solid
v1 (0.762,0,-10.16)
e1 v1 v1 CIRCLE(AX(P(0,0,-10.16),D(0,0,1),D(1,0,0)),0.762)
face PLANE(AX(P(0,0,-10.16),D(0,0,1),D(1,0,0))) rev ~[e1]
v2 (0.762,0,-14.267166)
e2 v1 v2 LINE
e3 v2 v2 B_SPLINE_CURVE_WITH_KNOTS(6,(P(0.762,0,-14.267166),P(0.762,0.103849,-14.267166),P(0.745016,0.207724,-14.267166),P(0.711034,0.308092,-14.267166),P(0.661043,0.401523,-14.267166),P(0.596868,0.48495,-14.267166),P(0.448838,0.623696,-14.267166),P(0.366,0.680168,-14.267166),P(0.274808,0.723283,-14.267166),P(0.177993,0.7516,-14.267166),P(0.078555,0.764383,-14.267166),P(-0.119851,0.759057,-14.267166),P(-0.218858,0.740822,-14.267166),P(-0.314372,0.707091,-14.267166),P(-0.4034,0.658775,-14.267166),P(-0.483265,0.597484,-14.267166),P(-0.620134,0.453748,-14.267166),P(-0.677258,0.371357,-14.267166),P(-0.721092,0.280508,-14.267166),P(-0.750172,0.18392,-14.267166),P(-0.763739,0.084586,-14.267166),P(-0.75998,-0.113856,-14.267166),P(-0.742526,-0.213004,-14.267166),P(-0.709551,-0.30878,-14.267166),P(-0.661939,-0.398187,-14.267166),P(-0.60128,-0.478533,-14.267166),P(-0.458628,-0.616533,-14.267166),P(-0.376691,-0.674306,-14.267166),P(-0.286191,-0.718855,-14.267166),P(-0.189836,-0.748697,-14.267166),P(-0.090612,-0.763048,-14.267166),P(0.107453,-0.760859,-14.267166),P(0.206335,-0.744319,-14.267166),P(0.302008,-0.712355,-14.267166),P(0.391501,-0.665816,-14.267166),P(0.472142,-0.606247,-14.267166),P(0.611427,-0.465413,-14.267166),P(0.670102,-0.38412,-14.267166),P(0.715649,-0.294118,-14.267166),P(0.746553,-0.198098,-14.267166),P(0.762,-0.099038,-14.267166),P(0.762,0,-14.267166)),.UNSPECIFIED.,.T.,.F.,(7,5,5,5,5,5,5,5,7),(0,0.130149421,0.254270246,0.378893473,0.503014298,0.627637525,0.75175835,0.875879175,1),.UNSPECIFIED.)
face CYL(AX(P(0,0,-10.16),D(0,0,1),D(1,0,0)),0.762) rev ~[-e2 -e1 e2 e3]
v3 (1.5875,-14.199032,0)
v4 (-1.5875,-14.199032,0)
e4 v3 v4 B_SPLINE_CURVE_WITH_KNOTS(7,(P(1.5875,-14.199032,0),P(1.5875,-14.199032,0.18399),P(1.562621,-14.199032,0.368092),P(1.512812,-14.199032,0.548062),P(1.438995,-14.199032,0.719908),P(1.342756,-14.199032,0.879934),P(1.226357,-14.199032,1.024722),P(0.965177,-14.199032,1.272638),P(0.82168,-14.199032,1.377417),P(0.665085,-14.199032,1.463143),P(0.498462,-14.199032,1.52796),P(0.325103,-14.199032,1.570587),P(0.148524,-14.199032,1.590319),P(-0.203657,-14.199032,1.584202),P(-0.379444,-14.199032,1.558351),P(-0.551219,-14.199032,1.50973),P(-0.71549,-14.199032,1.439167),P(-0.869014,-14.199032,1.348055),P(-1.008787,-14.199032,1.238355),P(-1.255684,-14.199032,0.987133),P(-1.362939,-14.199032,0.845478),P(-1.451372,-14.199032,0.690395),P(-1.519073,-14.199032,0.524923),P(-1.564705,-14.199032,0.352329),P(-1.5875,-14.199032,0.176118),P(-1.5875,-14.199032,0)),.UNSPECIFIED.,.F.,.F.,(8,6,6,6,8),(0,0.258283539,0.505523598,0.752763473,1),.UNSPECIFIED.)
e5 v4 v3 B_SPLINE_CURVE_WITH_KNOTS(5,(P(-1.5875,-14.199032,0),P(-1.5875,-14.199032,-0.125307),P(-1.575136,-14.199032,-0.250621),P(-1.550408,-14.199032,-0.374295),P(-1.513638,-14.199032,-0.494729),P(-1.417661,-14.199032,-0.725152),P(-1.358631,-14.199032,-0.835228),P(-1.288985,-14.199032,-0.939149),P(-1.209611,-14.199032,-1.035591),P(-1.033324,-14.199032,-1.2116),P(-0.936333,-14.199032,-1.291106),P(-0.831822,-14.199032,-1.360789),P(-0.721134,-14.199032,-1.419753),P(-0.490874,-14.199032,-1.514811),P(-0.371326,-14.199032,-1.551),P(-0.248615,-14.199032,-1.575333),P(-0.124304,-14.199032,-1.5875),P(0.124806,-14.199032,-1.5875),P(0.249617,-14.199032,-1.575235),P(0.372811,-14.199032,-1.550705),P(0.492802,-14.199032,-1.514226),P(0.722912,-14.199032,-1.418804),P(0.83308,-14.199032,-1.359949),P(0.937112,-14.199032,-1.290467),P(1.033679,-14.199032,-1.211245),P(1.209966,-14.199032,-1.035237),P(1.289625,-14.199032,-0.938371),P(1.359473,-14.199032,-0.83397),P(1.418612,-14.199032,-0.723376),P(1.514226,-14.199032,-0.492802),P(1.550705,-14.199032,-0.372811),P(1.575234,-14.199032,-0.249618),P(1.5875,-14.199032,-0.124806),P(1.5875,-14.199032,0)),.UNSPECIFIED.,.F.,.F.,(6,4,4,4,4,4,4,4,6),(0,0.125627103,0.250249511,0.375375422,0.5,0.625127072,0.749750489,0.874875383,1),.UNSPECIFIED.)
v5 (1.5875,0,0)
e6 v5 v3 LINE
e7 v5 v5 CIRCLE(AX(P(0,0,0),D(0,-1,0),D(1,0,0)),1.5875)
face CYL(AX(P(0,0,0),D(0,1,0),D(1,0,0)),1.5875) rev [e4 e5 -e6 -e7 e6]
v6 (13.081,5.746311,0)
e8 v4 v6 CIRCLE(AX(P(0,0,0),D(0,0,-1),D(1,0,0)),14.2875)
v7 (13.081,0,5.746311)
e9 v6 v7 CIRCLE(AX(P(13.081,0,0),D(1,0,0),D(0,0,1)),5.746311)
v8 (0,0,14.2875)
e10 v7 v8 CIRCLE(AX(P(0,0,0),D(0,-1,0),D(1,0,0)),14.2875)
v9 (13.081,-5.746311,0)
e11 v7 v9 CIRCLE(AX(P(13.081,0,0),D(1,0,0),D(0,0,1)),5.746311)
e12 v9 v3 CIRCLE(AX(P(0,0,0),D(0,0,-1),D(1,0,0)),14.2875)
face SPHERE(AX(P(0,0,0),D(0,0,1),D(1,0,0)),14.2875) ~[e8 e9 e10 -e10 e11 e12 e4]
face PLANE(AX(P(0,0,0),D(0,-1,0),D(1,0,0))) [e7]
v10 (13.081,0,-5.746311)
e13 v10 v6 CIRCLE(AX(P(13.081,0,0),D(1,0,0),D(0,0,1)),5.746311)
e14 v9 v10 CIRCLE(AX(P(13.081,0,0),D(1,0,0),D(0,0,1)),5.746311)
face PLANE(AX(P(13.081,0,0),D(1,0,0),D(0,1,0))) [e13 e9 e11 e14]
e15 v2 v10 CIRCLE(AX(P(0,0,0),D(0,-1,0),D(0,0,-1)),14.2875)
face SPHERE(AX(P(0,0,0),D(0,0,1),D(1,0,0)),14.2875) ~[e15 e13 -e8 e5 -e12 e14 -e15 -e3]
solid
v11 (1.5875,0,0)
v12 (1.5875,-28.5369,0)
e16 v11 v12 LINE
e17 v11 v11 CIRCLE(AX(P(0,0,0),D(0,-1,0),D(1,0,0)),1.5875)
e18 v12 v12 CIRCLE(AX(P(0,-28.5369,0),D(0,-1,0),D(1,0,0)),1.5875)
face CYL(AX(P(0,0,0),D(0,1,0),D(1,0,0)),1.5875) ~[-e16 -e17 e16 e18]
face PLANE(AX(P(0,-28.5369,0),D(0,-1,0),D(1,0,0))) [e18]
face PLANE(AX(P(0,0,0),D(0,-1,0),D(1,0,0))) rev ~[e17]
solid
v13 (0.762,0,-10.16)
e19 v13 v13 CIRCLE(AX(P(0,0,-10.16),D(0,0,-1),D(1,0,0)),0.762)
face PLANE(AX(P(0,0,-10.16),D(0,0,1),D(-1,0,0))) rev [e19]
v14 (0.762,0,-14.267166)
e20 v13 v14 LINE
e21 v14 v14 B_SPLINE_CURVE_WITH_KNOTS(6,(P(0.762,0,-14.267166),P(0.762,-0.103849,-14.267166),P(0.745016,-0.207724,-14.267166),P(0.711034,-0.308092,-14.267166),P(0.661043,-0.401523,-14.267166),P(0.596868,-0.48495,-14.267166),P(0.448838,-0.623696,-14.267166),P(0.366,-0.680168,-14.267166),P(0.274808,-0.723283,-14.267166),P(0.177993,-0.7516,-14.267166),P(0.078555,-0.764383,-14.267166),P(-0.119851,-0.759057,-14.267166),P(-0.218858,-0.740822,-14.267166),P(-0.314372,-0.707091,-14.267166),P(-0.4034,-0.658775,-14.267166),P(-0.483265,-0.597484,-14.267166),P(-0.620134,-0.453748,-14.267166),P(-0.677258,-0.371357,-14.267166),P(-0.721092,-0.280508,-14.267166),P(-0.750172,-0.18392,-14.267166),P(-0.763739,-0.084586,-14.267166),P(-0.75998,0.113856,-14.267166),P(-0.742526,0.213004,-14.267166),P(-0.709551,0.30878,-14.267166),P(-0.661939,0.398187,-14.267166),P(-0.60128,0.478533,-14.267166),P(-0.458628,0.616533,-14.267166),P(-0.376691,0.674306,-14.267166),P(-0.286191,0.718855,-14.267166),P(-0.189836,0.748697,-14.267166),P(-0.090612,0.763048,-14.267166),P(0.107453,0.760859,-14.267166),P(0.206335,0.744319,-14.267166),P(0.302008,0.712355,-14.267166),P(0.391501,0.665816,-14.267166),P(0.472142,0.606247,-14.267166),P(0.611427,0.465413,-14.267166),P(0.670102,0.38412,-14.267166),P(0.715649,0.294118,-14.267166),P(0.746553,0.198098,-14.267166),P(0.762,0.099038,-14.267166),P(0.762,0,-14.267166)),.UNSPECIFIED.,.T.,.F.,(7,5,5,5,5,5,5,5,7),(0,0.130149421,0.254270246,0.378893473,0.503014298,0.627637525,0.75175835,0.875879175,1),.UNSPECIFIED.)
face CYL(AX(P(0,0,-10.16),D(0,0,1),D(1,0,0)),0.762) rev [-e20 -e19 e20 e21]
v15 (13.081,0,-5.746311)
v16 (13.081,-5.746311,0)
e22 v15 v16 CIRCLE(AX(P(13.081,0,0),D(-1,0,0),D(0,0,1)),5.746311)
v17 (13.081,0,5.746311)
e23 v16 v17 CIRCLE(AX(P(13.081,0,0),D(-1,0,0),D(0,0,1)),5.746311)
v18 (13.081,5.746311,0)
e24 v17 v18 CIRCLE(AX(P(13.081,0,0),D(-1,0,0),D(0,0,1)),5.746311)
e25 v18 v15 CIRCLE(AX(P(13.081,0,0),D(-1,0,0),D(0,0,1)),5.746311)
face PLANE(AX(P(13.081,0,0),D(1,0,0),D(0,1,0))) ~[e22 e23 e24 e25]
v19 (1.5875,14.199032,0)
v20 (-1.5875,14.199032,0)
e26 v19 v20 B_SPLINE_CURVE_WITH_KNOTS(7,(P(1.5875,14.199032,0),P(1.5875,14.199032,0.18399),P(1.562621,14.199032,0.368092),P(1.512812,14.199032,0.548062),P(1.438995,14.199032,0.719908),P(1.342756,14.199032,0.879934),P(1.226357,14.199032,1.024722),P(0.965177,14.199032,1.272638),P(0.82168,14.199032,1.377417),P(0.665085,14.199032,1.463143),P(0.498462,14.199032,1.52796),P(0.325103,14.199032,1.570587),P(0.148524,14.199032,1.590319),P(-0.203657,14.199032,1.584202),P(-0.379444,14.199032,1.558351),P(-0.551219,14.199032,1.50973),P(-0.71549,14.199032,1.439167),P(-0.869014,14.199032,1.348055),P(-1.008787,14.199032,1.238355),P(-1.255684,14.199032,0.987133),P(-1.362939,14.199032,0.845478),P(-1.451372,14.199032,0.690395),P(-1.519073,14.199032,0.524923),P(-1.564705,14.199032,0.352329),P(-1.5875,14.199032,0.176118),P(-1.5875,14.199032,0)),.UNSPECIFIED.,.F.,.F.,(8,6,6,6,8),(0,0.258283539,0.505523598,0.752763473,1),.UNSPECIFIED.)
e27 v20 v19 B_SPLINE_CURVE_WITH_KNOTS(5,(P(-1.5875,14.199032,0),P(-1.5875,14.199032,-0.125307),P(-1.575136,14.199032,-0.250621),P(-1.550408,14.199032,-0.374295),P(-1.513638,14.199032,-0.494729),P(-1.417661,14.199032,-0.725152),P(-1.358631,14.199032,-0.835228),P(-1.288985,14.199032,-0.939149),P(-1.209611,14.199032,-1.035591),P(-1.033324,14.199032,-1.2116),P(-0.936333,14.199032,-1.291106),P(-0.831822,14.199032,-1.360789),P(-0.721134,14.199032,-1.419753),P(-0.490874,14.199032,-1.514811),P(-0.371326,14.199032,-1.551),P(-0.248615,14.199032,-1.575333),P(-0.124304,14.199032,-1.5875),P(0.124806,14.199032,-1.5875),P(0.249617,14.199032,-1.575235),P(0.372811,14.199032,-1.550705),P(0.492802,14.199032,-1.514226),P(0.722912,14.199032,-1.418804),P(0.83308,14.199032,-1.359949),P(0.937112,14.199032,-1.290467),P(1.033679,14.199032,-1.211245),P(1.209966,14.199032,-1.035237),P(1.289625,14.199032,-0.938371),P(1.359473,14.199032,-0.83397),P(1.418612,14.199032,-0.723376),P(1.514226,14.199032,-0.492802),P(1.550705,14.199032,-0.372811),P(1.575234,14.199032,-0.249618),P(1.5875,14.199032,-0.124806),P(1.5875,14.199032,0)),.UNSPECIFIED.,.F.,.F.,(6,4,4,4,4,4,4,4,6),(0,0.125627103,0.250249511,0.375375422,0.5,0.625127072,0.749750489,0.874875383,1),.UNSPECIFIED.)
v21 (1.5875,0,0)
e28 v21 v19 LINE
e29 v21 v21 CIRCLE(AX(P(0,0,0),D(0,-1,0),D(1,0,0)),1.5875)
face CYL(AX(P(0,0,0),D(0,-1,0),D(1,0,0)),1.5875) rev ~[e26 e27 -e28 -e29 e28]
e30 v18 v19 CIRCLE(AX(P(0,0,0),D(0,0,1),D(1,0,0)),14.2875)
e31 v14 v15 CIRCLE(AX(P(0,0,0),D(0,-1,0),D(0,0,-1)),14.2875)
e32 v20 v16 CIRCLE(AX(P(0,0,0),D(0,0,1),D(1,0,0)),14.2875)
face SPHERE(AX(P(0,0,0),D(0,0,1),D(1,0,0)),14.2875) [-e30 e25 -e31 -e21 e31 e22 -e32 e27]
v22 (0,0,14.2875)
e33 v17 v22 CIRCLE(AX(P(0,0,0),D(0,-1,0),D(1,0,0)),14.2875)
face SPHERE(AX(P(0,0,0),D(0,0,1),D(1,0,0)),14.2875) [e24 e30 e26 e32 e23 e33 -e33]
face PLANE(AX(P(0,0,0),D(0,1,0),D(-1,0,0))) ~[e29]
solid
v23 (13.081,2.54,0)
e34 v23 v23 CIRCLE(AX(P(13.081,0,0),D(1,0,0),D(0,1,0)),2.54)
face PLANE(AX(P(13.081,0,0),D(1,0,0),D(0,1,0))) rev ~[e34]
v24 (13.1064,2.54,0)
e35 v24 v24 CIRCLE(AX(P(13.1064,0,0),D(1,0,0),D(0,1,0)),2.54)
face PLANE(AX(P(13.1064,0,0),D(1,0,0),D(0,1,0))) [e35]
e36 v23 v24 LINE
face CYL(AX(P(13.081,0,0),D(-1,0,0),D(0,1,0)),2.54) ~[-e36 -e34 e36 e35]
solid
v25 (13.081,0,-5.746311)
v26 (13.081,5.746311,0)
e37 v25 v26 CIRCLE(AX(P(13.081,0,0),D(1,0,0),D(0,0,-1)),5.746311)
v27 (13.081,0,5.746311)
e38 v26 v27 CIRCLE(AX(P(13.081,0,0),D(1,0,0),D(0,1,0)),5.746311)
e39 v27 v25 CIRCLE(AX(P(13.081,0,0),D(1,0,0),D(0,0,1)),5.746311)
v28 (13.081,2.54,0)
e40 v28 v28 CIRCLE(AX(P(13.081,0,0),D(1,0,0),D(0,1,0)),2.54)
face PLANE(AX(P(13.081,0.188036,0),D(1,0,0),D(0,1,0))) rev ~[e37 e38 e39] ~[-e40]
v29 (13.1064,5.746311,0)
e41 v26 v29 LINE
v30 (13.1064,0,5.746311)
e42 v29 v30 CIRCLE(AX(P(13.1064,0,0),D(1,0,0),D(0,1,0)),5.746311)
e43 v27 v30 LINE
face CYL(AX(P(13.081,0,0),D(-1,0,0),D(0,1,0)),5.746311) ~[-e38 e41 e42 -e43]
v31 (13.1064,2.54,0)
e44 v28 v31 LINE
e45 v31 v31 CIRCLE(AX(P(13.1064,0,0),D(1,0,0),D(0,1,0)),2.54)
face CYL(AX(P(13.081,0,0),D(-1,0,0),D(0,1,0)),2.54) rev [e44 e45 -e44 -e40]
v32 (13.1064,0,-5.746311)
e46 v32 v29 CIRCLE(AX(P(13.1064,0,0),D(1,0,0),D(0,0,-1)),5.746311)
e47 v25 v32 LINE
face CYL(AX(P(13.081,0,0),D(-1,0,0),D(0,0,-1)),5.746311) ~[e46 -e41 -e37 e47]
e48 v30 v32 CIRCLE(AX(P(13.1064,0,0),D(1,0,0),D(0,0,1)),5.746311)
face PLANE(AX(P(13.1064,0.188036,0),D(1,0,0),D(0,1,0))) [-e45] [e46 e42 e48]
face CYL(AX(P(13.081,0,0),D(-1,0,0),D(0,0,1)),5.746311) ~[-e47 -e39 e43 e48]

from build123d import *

# Parameters (mm, degrees)
F3_START  = 13.081
F2_R      = 5.7833610308
F3_DEPTH  = 1.2065
F4_R      = 2.54
F5_DEPTH  = 0.0254
F6_DEPTH  = 0.0254
F8_START  = -10.16
F7_R      = 0.762
F8_DEPTH  = 35.56
F9_R      = 1.5875
F10_DEPTH = 14.2875
F11_DEPTH = 28.5369


# Not quite as in the source:
# - a feature names something its author has since deleted; it is built from what else it names


with BuildPart() as f1:
    # F0 (on Front) → F1 (revolve)
    with BuildSketch(Plane.XZ):
        with BuildLine():
            ThreePointArc((0, -14.2875), (10.1027881362, -10.1027881362), (14.2875, 0))
            ThreePointArc((14.2875, 0), (10.1027881362, 10.1027881362), (0, 14.2875))
            Line((0, 14.2875), (0, -14.2875))
        make_face()
    revolve(axis=Axis((0, 0, 0), (0, 0, -1)))

    # F2 (on Right) → F3 (cut)
    with BuildSketch(Plane.YZ.offset(F3_START)):
        Circle(F2_R)
    extrude(amount=F3_DEPTH, mode=Mode.SUBTRACT)

    # F7 (on Top) → F8 (cut)
    with BuildSketch(Plane.XY.offset(F8_START)):
        Circle(F7_R)
    extrude(amount=-F8_DEPTH, mode=Mode.SUBTRACT)

    # F9 (on Front) → F10 (cut, through all)
    with BuildSketch(Plane.XZ):
        Circle(F9_R)
    extrude(amount=F10_DEPTH, mode=Mode.SUBTRACT)


with BuildPart() as f5:
    # F4 (on face) → F5 (new body)
    with BuildSketch(Plane.YZ.offset(13.081)):
        Circle(F4_R)
    extrude(amount=F5_DEPTH)


with BuildPart() as f6:
    # F4 (on face) → F6 (new body)
    with BuildSketch(Plane.YZ.offset(13.081)):
        with BuildLine():
            ThreePointArc((0, -5.7463114474), (4.0632557912, -4.0632557912), (5.7463114474, 0))
            ThreePointArc((5.7463114474, 0), (4.0632557912, 4.0632557912), (0, 5.7463114474))
            ThreePointArc((0, 5.7463114474), (-5.7463114474, 0), (0, -5.7463114474))
        make_face()
        Circle(F4_R, mode=Mode.SUBTRACT)
    extrude(amount=F6_DEPTH)


with BuildPart() as f11:
    # F11 (new): a face of the model
    f11_faces = [f1.part.faces().sort_by_distance(p)[0] for p in [
        (0, 0, 0),
    ]]
    extrude(f11_faces, amount=F11_DEPTH)


with BuildPart() as f12_1:
    # F12: instance of F1
    add(f1.part.mirror(Plane.XZ))


solid = Compound([f1.part, f5.part, f6.part, f11.part, f12_1.part])
